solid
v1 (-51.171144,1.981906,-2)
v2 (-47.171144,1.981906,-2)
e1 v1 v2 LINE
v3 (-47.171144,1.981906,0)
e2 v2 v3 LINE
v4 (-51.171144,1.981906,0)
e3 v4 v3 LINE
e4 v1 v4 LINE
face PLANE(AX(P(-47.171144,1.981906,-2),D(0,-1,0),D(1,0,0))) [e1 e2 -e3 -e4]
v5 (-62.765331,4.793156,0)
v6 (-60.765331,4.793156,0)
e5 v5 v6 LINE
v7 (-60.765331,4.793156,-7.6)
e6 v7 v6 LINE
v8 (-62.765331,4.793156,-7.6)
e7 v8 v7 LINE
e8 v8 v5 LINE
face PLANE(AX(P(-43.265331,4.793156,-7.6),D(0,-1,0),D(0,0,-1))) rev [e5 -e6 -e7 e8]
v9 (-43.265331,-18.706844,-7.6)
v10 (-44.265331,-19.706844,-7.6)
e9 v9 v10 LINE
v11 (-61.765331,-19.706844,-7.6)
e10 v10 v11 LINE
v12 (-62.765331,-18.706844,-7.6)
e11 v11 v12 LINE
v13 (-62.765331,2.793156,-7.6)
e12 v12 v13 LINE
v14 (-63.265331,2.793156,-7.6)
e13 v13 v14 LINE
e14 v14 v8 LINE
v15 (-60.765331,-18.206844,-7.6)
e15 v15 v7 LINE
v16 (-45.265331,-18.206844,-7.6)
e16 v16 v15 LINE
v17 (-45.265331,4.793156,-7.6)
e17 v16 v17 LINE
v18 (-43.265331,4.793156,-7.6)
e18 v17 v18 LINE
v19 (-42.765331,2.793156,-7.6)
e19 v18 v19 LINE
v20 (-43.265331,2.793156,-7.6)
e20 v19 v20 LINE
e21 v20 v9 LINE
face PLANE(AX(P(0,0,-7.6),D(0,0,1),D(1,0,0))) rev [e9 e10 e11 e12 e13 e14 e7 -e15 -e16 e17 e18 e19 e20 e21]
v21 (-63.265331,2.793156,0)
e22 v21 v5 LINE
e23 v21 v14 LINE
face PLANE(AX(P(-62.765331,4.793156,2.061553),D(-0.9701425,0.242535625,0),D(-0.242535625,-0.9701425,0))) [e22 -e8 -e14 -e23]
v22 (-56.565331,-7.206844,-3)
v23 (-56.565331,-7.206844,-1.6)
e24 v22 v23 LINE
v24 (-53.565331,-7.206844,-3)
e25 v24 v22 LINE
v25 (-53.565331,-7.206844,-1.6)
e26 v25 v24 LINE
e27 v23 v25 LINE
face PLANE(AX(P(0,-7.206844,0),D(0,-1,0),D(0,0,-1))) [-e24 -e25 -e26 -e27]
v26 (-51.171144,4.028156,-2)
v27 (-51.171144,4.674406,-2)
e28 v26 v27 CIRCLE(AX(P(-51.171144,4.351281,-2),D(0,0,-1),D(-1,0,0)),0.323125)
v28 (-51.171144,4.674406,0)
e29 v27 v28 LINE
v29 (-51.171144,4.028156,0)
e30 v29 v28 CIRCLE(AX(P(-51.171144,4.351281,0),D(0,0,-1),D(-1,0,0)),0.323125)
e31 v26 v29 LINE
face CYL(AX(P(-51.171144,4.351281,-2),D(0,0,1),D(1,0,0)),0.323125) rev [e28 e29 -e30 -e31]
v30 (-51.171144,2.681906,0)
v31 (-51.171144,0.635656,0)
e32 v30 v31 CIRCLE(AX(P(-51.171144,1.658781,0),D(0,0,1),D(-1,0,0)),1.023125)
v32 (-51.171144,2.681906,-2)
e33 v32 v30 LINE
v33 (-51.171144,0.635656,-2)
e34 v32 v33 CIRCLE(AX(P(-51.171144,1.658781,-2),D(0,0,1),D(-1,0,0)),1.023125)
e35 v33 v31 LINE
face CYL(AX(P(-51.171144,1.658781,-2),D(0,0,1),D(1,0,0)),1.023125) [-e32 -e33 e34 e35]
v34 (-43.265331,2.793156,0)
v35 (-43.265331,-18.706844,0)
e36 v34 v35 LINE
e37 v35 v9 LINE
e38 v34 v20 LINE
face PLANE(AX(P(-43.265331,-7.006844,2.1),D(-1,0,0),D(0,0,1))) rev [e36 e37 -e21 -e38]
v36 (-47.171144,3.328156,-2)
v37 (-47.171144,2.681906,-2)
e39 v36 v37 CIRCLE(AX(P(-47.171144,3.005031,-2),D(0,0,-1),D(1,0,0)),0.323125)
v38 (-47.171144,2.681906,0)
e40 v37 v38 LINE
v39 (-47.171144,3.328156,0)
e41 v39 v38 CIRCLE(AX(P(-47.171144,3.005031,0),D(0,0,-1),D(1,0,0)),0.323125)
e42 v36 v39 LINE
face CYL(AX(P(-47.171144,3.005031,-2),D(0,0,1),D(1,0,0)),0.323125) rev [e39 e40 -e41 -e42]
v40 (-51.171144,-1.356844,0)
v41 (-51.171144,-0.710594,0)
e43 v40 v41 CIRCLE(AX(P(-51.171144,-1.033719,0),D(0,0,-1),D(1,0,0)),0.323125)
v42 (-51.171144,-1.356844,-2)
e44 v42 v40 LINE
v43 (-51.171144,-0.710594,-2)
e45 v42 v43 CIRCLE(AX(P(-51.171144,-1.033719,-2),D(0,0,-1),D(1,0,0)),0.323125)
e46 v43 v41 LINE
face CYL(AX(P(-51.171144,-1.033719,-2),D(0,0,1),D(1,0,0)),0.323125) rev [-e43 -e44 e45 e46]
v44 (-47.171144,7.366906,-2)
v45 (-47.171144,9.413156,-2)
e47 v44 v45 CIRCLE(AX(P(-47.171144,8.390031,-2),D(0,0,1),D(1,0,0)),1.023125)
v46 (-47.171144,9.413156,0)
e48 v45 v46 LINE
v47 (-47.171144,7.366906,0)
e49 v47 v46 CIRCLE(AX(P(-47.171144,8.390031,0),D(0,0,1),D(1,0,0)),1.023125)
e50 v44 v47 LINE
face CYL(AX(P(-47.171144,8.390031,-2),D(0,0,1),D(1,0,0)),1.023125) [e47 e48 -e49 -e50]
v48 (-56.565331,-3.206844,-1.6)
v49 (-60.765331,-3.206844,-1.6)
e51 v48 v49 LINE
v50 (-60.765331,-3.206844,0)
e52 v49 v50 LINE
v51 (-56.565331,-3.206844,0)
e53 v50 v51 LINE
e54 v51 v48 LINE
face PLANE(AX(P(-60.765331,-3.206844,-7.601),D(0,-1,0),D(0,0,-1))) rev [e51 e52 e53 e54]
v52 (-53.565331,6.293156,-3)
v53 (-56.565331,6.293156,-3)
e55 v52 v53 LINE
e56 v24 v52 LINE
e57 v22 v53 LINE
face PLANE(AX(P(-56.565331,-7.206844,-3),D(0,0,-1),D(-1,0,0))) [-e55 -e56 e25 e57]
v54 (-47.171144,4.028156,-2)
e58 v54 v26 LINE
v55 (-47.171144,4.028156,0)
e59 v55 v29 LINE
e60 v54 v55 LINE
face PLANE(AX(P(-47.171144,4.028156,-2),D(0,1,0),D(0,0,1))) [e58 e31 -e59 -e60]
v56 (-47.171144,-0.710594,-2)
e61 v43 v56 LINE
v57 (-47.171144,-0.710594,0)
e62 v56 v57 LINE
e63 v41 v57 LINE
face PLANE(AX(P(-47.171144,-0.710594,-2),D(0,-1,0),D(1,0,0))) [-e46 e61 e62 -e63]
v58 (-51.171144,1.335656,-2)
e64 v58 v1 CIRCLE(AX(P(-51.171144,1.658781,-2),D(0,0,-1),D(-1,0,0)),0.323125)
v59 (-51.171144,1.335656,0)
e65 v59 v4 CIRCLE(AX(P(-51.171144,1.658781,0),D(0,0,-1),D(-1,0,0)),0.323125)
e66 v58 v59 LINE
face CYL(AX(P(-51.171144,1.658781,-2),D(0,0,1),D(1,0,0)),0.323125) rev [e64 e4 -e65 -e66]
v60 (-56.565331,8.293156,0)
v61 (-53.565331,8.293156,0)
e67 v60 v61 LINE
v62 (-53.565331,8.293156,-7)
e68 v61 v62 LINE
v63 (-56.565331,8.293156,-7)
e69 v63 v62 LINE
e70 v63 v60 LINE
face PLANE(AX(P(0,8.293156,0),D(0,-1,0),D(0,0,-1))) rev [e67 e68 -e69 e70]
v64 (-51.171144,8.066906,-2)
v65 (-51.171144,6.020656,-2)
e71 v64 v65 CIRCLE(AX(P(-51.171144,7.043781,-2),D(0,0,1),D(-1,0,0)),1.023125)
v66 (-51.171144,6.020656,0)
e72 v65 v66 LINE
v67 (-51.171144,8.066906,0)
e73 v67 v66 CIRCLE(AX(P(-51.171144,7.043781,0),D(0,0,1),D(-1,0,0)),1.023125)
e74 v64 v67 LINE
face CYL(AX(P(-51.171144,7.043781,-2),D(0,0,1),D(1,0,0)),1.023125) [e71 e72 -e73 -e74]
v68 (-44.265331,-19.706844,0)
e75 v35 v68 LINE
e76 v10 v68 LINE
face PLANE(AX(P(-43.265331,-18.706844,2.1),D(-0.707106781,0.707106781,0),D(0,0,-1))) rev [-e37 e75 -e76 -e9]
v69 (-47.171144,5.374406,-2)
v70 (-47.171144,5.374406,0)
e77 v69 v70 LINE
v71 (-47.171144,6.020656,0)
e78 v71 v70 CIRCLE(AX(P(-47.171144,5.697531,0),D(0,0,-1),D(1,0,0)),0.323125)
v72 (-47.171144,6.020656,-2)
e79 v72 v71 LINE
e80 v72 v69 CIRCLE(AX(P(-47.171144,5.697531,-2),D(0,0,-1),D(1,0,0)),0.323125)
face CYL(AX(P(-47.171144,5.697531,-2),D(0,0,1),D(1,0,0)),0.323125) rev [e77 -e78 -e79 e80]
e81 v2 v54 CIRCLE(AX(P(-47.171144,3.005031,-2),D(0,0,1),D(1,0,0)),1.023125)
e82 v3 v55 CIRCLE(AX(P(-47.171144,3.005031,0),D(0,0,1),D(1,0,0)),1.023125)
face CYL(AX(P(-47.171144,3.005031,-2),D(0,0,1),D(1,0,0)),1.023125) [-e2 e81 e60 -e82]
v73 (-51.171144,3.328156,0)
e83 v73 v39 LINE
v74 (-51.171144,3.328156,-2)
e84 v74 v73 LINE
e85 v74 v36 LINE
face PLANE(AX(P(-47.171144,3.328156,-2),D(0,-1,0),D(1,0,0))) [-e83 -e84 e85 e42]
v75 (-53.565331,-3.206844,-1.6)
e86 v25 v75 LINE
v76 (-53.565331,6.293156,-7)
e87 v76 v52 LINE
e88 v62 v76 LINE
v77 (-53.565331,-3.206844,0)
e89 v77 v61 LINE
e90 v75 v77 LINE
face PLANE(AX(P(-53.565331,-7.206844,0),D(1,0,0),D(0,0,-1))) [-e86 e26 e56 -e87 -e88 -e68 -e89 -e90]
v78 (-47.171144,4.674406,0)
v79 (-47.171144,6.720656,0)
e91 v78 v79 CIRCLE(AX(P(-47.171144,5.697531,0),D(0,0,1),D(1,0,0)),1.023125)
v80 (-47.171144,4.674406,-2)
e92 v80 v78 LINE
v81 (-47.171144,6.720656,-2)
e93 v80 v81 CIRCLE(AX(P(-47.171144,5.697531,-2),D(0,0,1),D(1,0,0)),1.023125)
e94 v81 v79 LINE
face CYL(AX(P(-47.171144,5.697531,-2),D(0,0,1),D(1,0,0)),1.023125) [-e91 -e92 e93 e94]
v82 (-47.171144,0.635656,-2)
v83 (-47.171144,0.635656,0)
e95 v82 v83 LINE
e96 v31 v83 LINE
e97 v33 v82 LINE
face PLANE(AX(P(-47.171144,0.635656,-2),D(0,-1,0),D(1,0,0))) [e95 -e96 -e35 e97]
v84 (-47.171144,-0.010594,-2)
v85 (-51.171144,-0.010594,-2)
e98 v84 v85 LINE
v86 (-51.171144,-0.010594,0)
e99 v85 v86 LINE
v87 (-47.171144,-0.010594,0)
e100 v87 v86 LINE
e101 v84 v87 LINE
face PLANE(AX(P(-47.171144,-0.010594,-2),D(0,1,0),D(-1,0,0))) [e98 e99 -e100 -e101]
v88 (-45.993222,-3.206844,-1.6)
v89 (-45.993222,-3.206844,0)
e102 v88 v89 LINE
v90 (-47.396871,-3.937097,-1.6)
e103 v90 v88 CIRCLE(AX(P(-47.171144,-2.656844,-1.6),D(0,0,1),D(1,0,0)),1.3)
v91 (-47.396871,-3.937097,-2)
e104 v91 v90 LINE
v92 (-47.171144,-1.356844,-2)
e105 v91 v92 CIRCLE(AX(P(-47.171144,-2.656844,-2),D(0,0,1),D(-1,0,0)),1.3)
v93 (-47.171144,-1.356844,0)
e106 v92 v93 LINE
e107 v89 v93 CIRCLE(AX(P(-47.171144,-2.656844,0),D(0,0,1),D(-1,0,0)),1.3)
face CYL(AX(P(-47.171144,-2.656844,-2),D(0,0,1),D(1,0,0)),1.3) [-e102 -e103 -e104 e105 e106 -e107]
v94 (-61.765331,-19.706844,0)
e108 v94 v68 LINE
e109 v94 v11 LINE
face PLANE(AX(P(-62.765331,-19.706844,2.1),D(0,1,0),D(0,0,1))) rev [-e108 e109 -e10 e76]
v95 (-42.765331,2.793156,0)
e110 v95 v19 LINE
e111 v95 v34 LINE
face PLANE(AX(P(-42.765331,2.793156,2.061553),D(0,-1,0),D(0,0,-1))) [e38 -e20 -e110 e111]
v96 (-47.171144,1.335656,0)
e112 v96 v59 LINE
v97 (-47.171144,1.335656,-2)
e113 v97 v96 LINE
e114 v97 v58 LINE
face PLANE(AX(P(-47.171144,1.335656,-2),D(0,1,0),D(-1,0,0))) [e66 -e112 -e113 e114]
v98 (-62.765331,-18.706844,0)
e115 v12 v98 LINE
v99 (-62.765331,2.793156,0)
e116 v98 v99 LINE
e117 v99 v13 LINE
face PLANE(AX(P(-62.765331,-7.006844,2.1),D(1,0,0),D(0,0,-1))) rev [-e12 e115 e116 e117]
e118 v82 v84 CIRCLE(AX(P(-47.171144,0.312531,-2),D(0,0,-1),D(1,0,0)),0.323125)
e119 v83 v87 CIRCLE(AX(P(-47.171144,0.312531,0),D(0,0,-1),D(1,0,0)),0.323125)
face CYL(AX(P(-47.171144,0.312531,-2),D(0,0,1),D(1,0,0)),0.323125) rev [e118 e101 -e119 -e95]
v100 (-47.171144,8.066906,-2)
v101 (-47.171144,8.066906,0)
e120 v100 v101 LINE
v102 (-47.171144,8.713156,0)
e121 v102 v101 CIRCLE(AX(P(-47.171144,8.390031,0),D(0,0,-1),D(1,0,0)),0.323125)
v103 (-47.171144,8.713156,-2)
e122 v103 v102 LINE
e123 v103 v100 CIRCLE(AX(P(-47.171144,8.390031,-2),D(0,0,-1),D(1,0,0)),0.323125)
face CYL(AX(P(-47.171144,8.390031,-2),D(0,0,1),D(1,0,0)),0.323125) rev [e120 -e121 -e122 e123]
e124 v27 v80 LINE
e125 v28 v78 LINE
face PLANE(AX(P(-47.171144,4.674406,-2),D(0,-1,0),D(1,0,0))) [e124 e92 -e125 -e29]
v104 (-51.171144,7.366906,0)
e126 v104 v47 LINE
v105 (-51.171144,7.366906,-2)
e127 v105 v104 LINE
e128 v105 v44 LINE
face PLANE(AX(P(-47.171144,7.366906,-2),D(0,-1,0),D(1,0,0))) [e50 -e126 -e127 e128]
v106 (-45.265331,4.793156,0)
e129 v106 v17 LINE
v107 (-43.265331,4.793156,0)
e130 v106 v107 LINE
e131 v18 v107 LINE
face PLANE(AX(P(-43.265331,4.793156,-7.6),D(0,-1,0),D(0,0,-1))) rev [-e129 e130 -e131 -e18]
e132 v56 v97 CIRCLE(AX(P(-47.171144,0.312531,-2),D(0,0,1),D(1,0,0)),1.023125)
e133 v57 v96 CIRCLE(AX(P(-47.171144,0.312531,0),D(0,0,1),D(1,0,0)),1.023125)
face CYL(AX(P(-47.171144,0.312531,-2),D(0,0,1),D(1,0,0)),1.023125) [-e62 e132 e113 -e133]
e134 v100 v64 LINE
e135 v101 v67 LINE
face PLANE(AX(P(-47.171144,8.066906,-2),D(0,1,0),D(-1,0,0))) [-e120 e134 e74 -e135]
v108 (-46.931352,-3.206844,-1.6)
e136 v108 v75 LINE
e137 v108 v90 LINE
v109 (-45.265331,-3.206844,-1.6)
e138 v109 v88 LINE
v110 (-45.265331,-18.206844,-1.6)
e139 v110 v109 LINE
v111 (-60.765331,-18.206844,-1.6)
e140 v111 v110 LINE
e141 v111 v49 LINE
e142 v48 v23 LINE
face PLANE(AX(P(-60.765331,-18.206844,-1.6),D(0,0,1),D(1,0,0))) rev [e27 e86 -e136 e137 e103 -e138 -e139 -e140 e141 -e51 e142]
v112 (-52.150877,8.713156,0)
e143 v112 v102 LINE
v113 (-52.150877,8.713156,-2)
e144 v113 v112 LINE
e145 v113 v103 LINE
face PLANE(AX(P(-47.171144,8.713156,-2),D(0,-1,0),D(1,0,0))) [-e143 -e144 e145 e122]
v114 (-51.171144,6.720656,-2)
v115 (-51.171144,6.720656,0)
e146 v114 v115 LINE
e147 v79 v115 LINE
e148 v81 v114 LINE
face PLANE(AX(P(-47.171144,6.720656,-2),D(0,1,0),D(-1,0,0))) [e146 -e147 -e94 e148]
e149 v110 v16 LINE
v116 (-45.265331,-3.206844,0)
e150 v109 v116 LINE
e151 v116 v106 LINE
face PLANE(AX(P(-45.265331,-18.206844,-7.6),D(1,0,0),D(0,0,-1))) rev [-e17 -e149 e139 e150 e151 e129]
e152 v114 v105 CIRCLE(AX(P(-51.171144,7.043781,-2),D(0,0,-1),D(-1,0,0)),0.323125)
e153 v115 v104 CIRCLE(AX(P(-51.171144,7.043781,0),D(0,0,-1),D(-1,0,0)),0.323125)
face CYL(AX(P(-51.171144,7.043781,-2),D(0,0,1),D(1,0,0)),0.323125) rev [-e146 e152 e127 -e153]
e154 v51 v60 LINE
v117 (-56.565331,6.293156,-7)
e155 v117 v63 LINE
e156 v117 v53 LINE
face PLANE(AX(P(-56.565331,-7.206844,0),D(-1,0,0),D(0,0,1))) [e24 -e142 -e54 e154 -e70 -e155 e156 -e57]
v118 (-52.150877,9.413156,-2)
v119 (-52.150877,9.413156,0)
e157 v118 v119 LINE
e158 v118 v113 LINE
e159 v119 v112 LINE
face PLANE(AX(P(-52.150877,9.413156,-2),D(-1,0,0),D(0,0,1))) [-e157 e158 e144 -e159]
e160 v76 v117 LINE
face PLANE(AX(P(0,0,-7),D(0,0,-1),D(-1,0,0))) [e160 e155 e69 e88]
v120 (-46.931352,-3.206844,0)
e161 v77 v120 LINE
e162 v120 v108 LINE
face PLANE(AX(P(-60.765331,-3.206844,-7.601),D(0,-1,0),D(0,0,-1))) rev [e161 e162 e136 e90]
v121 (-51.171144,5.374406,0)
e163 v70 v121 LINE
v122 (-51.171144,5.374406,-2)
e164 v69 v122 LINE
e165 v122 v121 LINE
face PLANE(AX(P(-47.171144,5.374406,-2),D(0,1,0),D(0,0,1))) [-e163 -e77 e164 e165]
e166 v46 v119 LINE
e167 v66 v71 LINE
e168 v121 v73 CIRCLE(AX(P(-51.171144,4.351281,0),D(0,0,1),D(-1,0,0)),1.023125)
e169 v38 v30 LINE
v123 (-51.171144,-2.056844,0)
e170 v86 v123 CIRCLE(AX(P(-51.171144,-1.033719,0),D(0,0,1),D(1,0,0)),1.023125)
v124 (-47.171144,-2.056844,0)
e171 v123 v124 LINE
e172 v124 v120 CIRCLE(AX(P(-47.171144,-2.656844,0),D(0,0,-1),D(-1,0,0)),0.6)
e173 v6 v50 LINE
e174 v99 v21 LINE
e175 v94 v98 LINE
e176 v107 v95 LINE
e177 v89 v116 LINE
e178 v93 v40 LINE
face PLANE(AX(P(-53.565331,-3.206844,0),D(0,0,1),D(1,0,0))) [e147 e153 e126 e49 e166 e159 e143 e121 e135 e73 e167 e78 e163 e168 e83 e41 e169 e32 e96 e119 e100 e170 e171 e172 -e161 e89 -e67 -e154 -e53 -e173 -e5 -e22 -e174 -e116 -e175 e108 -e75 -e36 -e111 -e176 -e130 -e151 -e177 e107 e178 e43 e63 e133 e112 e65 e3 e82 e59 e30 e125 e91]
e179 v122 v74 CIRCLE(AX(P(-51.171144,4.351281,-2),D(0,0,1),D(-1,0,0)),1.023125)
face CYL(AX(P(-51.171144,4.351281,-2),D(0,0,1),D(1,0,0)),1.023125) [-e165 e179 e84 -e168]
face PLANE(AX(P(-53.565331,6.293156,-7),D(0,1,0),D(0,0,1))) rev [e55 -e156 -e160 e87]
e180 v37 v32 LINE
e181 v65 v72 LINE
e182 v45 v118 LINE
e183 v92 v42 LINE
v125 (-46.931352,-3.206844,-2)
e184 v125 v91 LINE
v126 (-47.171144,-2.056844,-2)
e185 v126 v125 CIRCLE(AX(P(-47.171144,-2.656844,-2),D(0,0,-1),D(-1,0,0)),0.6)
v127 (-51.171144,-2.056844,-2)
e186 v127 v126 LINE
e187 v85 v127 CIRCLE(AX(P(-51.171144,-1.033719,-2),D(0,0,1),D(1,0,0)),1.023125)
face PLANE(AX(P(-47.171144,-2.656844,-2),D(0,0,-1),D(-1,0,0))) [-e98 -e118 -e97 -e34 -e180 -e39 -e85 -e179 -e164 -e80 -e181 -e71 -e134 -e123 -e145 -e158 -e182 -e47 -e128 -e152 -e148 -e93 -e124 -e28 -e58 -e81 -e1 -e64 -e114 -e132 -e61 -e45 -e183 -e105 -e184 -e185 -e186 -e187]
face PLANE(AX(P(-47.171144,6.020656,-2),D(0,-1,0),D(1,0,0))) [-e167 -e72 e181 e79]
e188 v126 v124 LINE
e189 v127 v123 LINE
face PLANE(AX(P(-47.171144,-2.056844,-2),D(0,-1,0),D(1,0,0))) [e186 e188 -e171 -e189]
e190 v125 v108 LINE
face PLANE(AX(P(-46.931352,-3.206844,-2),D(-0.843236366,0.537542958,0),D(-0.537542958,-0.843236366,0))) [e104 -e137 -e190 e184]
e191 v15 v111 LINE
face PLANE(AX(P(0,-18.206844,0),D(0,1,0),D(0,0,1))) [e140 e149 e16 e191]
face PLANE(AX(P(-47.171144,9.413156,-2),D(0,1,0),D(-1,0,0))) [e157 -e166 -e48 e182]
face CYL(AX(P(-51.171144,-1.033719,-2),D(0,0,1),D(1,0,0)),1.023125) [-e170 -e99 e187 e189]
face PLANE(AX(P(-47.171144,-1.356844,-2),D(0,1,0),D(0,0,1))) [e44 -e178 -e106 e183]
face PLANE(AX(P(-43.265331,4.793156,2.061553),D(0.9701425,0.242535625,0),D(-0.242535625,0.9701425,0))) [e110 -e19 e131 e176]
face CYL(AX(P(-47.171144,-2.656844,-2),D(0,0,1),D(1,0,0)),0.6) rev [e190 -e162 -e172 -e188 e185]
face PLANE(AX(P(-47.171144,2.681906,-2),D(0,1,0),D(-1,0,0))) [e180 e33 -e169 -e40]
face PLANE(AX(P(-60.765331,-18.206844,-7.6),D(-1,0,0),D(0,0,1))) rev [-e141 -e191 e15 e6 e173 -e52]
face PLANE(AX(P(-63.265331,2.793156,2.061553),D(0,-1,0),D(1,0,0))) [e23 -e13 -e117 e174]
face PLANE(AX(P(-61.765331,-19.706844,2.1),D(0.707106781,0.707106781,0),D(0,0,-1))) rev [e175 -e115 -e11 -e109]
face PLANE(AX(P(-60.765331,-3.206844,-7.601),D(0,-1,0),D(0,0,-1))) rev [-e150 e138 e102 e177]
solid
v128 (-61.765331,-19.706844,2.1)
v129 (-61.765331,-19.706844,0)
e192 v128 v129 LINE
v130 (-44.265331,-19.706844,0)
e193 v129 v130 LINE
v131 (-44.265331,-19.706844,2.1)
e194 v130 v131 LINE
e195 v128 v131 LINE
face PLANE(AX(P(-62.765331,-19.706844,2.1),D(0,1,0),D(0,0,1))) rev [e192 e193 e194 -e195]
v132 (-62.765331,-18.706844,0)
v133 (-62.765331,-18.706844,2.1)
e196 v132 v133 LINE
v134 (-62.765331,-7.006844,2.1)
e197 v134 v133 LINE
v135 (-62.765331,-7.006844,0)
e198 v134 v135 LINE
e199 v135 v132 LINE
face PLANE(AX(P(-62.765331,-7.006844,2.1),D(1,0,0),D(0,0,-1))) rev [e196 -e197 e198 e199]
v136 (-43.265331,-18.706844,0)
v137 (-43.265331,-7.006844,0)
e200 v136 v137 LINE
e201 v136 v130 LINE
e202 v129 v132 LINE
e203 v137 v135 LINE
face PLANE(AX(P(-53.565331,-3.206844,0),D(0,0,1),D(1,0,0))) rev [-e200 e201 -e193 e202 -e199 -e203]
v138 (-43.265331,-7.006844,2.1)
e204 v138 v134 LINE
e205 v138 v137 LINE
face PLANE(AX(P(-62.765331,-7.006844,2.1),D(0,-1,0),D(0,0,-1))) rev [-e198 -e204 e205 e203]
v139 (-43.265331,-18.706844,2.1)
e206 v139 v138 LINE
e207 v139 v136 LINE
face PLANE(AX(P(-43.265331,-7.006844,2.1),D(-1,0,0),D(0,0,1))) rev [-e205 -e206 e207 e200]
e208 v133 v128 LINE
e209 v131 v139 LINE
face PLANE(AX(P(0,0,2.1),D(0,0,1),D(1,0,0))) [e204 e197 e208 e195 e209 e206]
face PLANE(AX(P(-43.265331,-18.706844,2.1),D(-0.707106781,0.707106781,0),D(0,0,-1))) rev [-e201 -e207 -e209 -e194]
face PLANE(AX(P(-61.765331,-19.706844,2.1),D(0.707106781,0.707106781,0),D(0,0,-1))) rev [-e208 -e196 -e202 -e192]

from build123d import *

# Parameters (mm, degrees)
SKETCH_1_W           = 19.5
SKETCH_1_H           = 12.7
EXTRUDE_1_DEPTH      = 2.1
SKETCH_2_W           = 19.5
SKETCH_2_H           = 24.5
EXTRUDE_2_DEPTH      = 7.6
SKETCH_3_W           = 15.5
SKETCH_3_H           = 6
CUT_EXTRUDE_1_DEPTH  = 23
CUT_EXTRUDE_2_REACH  = 68.224
SKETCH_4_W           = 15.5
SKETCH_4_H           = 8
EXTRUDE_4_DEPTH      = 7.6
EXTRUDE_5_DEPTH      = 2
EXTRUDE_6_DEPTH      = 11.5
EXTRUDE_6_DEPTH_BACK = 4
SKETCH_8_W           = 3
SKETCH_8_H           = 3
SKETCH_9_W           = 3
SKETCH_9_H           = 2
EXTRUDE_7_DEPTH      = 4
CHAMFER_1_SIZE       = 1


# Read off the part's stored shape, not the designer's step: 分割1
with BuildPart() as part:
    # 草图1 → 凸台-拉伸1 (new body)
    with BuildSketch(Plane.XY):
        with Locations((-53.015330564, -13.356843897)):
            Rectangle(SKETCH_1_W, SKETCH_1_H)
    extrude(amount=EXTRUDE_1_DEPTH)

    # 草图2 → 凸台-拉伸2 (add)
    with BuildSketch(Plane(origin=(0, 0, 0), x_dir=(-1, 0, 0), z_dir=(0, 0, -1))):
        with Locations((53.015330564, -7.456843897)):
            Rectangle(SKETCH_2_W, SKETCH_2_H)
    extrude(amount=EXTRUDE_2_DEPTH)

    # 草图3 → 切除-拉伸1 (cut)
    with BuildSketch(Plane(origin=(0, 4.793156103, 0), x_dir=(1, 0, 0), z_dir=(0, 1, 0))):
        with Locations((-53.015330564, 4.6)):
            Rectangle(SKETCH_3_W, SKETCH_3_H)
    extrude(amount=-CUT_EXTRUDE_1_DEPTH, mode=Mode.SUBTRACT)

    # 草图4 → 切除-拉伸2 (cut, up to next)
    with BuildSketch(Plane.XY, mode=Mode.PRIVATE) as cut_extrude_2_sk1:
        with Locations((-53.015330564, 0.793156103)):
            Rectangle(SKETCH_4_W, SKETCH_4_H)
    cut_extrude_2_tool1 = extrude(cut_extrude_2_sk1.sketch, amount=-CUT_EXTRUDE_2_REACH, mode=Mode.PRIVATE) & part.part
    add(cut_extrude_2_tool1.solids().sort_by_distance((-53.015331, 0.793156, 0))[0], mode=Mode.SUBTRACT)

    # 草图5 → 凸台-拉伸4 (add)
    with BuildSketch(Plane(origin=(0, 0, -7.6), x_dir=(-1, 0, 0), z_dir=(0, 0, -1))):
        Polygon((62.765330564, 4.793156103), (63.265330564, 2.793156103), (62.765330564, 2.793156103), align=None)
        Polygon((43.265330564, 4.793156103), (42.765330564, 2.793156103), (43.265330564, 2.793156103), align=None)
    extrude(amount=-EXTRUDE_4_DEPTH)

    # 草图7 → 凸台-拉伸5 (add)
    with BuildSketch(Plane.XY):
        with BuildLine():
            Line((-47.171144023, -1.356843897), (-51.171144023, -1.356843897))
            ThreePointArc((-51.171144023, -1.356843897), (-51.494269023, -1.033718897), (-51.171144023, -0.710593897))
            Line((-51.171144023, -0.710593897), (-47.171144023, -0.710593897))
            ThreePointArc((-47.171144023, -0.710593897), (-46.148019023, 0.312531103), (-47.171144023, 1.335656103))
            Line((-47.171144023, 1.335656103), (-51.171144023, 1.335656103))
            ThreePointArc((-51.171144023, 1.335656103), (-51.494269023, 1.658781103), (-51.171144023, 1.981906103))
            Line((-51.171144023, 1.981906103), (-47.171144023, 1.981906103))
            ThreePointArc((-47.171144023, 1.981906103), (-46.148019023, 3.005031103), (-47.171144023, 4.028156103))
            Line((-47.171144023, 4.028156103), (-51.171144023, 4.028156103))
            ThreePointArc((-51.171144023, 4.028156103), (-51.494269023, 4.351281103), (-51.171144023, 4.674406103))
            Line((-51.171144023, 4.674406103), (-47.171144023, 4.674406103))
            ThreePointArc((-47.171144023, 4.674406103), (-46.148019023, 5.697531103), (-47.171144023, 6.720656103))
            Line((-47.171144023, 6.720656103), (-51.171144023, 6.720656103))
            ThreePointArc((-51.171144023, 6.720656103), (-51.494269023, 7.043781103), (-51.171144023, 7.366906103))
            Line((-51.171144023, 7.366906103), (-47.171144023, 7.366906103))
            ThreePointArc((-47.171144023, 7.366906103), (-46.148019023, 8.390031103), (-47.171144023, 9.413156103))
            Line((-47.171144023, 9.413156103), (-52.150877486, 9.413156103))
            Line((-52.150877486, 9.413156103), (-52.150877486, 8.713156103))
            Line((-52.150877486, 8.713156103), (-47.171144023, 8.713156103))
            ThreePointArc((-47.171144023, 8.713156103), (-46.848019023, 8.390031103), (-47.171144023, 8.066906103))
            Line((-47.171144023, 8.066906103), (-51.171144023, 8.066906103))
            ThreePointArc((-51.171144023, 8.066906103), (-52.194269023, 7.043781103), (-51.171144023, 6.020656103))
            Line((-51.171144023, 6.020656103), (-47.171144023, 6.020656103))
            ThreePointArc((-47.171144023, 6.020656103), (-46.848019023, 5.697531103), (-47.171144023, 5.374406103))
            Line((-47.171144023, 5.374406103), (-51.171144023, 5.374406103))
            ThreePointArc((-51.171144023, 5.374406103), (-52.194269023, 4.351281103), (-51.171144023, 3.328156103))
            Line((-51.171144023, 3.328156103), (-47.171144023, 3.328156103))
            ThreePointArc((-47.171144023, 3.328156103), (-46.848019023, 3.005031103), (-47.171144023, 2.681906103))
            Line((-47.171144023, 2.681906103), (-51.171144023, 2.681906103))
            ThreePointArc((-51.171144023, 2.681906103), (-52.194269023, 1.658781103), (-51.171144023, 0.635656103))
            Line((-51.171144023, 0.635656103), (-47.171144023, 0.635656103))
            ThreePointArc((-47.171144023, 0.635656103), (-46.848019023, 0.312531103), (-47.171144023, -0.010593897))
            Line((-47.171144023, -0.010593897), (-51.171144023, -0.010593897))
            ThreePointArc((-51.171144023, -0.010593897), (-52.194269023, -1.033718897), (-51.171144023, -2.056843897))
            Line((-51.171144023, -2.056843897), (-47.171144023, -2.056843897))
            ThreePointArc((-47.171144023, -2.056843897), (-46.583777016, -2.53436941), (-46.931352446, -3.206843897))
            Line((-46.931352446, -3.206843897), (-47.396871104, -3.937096718))
            ThreePointArc((-47.396871104, -3.937096718), (-45.876090227, -2.770138498), (-47.171144023, -1.356843897))
        make_face()
    extrude(amount=-EXTRUDE_5_DEPTH)

    # 草图8 → 凸台-拉伸6 (add, two sides: drawn at the far end of the back side and taken through both)
    with BuildSketch(Plane(origin=(0, -3.206843897, 0), x_dir=(1, 0, 0), z_dir=(0, 1, 0)).offset(-EXTRUDE_6_DEPTH_BACK)):
        with Locations((-55.065330564, 1.5)):
            Rectangle(SKETCH_8_W, SKETCH_8_H)
    extrude(amount=EXTRUDE_6_DEPTH + EXTRUDE_6_DEPTH_BACK)

    # 草图9 → 凸台-拉伸7 (add)
    with BuildSketch(Plane(origin=(0, 0, -3), x_dir=(-1, 0, 0), z_dir=(0, 0, -1))):
        with Locations((55.065330564, 7.293156103)):
            Rectangle(SKETCH_9_W, SKETCH_9_H)
    extrude(amount=EXTRUDE_7_DEPTH)

    # 倒角1
    chamfer_1_edges = [part.edges().sort_by_distance(p)[0] for p in [
        (-43.265330564, -19.706843897, -2.75),
        (-62.765330564, -19.706843897, -2.75),
    ]]
    chamfer(chamfer_1_edges, length=CHAMFER_1_SIZE)


with BuildPart() as body_2:
    # Split Bodies 1: the piece on the far side of the plane
    add(part.part)
    split(bisect_by=Plane.XY, keep=Keep.BOTTOM)


with BuildPart() as part_1:
    add(part.part)

    # Split Bodies 1
    split(bisect_by=Plane.XY, keep=Keep.TOP)


solid = Compound([body_2.part, part_1.part])
